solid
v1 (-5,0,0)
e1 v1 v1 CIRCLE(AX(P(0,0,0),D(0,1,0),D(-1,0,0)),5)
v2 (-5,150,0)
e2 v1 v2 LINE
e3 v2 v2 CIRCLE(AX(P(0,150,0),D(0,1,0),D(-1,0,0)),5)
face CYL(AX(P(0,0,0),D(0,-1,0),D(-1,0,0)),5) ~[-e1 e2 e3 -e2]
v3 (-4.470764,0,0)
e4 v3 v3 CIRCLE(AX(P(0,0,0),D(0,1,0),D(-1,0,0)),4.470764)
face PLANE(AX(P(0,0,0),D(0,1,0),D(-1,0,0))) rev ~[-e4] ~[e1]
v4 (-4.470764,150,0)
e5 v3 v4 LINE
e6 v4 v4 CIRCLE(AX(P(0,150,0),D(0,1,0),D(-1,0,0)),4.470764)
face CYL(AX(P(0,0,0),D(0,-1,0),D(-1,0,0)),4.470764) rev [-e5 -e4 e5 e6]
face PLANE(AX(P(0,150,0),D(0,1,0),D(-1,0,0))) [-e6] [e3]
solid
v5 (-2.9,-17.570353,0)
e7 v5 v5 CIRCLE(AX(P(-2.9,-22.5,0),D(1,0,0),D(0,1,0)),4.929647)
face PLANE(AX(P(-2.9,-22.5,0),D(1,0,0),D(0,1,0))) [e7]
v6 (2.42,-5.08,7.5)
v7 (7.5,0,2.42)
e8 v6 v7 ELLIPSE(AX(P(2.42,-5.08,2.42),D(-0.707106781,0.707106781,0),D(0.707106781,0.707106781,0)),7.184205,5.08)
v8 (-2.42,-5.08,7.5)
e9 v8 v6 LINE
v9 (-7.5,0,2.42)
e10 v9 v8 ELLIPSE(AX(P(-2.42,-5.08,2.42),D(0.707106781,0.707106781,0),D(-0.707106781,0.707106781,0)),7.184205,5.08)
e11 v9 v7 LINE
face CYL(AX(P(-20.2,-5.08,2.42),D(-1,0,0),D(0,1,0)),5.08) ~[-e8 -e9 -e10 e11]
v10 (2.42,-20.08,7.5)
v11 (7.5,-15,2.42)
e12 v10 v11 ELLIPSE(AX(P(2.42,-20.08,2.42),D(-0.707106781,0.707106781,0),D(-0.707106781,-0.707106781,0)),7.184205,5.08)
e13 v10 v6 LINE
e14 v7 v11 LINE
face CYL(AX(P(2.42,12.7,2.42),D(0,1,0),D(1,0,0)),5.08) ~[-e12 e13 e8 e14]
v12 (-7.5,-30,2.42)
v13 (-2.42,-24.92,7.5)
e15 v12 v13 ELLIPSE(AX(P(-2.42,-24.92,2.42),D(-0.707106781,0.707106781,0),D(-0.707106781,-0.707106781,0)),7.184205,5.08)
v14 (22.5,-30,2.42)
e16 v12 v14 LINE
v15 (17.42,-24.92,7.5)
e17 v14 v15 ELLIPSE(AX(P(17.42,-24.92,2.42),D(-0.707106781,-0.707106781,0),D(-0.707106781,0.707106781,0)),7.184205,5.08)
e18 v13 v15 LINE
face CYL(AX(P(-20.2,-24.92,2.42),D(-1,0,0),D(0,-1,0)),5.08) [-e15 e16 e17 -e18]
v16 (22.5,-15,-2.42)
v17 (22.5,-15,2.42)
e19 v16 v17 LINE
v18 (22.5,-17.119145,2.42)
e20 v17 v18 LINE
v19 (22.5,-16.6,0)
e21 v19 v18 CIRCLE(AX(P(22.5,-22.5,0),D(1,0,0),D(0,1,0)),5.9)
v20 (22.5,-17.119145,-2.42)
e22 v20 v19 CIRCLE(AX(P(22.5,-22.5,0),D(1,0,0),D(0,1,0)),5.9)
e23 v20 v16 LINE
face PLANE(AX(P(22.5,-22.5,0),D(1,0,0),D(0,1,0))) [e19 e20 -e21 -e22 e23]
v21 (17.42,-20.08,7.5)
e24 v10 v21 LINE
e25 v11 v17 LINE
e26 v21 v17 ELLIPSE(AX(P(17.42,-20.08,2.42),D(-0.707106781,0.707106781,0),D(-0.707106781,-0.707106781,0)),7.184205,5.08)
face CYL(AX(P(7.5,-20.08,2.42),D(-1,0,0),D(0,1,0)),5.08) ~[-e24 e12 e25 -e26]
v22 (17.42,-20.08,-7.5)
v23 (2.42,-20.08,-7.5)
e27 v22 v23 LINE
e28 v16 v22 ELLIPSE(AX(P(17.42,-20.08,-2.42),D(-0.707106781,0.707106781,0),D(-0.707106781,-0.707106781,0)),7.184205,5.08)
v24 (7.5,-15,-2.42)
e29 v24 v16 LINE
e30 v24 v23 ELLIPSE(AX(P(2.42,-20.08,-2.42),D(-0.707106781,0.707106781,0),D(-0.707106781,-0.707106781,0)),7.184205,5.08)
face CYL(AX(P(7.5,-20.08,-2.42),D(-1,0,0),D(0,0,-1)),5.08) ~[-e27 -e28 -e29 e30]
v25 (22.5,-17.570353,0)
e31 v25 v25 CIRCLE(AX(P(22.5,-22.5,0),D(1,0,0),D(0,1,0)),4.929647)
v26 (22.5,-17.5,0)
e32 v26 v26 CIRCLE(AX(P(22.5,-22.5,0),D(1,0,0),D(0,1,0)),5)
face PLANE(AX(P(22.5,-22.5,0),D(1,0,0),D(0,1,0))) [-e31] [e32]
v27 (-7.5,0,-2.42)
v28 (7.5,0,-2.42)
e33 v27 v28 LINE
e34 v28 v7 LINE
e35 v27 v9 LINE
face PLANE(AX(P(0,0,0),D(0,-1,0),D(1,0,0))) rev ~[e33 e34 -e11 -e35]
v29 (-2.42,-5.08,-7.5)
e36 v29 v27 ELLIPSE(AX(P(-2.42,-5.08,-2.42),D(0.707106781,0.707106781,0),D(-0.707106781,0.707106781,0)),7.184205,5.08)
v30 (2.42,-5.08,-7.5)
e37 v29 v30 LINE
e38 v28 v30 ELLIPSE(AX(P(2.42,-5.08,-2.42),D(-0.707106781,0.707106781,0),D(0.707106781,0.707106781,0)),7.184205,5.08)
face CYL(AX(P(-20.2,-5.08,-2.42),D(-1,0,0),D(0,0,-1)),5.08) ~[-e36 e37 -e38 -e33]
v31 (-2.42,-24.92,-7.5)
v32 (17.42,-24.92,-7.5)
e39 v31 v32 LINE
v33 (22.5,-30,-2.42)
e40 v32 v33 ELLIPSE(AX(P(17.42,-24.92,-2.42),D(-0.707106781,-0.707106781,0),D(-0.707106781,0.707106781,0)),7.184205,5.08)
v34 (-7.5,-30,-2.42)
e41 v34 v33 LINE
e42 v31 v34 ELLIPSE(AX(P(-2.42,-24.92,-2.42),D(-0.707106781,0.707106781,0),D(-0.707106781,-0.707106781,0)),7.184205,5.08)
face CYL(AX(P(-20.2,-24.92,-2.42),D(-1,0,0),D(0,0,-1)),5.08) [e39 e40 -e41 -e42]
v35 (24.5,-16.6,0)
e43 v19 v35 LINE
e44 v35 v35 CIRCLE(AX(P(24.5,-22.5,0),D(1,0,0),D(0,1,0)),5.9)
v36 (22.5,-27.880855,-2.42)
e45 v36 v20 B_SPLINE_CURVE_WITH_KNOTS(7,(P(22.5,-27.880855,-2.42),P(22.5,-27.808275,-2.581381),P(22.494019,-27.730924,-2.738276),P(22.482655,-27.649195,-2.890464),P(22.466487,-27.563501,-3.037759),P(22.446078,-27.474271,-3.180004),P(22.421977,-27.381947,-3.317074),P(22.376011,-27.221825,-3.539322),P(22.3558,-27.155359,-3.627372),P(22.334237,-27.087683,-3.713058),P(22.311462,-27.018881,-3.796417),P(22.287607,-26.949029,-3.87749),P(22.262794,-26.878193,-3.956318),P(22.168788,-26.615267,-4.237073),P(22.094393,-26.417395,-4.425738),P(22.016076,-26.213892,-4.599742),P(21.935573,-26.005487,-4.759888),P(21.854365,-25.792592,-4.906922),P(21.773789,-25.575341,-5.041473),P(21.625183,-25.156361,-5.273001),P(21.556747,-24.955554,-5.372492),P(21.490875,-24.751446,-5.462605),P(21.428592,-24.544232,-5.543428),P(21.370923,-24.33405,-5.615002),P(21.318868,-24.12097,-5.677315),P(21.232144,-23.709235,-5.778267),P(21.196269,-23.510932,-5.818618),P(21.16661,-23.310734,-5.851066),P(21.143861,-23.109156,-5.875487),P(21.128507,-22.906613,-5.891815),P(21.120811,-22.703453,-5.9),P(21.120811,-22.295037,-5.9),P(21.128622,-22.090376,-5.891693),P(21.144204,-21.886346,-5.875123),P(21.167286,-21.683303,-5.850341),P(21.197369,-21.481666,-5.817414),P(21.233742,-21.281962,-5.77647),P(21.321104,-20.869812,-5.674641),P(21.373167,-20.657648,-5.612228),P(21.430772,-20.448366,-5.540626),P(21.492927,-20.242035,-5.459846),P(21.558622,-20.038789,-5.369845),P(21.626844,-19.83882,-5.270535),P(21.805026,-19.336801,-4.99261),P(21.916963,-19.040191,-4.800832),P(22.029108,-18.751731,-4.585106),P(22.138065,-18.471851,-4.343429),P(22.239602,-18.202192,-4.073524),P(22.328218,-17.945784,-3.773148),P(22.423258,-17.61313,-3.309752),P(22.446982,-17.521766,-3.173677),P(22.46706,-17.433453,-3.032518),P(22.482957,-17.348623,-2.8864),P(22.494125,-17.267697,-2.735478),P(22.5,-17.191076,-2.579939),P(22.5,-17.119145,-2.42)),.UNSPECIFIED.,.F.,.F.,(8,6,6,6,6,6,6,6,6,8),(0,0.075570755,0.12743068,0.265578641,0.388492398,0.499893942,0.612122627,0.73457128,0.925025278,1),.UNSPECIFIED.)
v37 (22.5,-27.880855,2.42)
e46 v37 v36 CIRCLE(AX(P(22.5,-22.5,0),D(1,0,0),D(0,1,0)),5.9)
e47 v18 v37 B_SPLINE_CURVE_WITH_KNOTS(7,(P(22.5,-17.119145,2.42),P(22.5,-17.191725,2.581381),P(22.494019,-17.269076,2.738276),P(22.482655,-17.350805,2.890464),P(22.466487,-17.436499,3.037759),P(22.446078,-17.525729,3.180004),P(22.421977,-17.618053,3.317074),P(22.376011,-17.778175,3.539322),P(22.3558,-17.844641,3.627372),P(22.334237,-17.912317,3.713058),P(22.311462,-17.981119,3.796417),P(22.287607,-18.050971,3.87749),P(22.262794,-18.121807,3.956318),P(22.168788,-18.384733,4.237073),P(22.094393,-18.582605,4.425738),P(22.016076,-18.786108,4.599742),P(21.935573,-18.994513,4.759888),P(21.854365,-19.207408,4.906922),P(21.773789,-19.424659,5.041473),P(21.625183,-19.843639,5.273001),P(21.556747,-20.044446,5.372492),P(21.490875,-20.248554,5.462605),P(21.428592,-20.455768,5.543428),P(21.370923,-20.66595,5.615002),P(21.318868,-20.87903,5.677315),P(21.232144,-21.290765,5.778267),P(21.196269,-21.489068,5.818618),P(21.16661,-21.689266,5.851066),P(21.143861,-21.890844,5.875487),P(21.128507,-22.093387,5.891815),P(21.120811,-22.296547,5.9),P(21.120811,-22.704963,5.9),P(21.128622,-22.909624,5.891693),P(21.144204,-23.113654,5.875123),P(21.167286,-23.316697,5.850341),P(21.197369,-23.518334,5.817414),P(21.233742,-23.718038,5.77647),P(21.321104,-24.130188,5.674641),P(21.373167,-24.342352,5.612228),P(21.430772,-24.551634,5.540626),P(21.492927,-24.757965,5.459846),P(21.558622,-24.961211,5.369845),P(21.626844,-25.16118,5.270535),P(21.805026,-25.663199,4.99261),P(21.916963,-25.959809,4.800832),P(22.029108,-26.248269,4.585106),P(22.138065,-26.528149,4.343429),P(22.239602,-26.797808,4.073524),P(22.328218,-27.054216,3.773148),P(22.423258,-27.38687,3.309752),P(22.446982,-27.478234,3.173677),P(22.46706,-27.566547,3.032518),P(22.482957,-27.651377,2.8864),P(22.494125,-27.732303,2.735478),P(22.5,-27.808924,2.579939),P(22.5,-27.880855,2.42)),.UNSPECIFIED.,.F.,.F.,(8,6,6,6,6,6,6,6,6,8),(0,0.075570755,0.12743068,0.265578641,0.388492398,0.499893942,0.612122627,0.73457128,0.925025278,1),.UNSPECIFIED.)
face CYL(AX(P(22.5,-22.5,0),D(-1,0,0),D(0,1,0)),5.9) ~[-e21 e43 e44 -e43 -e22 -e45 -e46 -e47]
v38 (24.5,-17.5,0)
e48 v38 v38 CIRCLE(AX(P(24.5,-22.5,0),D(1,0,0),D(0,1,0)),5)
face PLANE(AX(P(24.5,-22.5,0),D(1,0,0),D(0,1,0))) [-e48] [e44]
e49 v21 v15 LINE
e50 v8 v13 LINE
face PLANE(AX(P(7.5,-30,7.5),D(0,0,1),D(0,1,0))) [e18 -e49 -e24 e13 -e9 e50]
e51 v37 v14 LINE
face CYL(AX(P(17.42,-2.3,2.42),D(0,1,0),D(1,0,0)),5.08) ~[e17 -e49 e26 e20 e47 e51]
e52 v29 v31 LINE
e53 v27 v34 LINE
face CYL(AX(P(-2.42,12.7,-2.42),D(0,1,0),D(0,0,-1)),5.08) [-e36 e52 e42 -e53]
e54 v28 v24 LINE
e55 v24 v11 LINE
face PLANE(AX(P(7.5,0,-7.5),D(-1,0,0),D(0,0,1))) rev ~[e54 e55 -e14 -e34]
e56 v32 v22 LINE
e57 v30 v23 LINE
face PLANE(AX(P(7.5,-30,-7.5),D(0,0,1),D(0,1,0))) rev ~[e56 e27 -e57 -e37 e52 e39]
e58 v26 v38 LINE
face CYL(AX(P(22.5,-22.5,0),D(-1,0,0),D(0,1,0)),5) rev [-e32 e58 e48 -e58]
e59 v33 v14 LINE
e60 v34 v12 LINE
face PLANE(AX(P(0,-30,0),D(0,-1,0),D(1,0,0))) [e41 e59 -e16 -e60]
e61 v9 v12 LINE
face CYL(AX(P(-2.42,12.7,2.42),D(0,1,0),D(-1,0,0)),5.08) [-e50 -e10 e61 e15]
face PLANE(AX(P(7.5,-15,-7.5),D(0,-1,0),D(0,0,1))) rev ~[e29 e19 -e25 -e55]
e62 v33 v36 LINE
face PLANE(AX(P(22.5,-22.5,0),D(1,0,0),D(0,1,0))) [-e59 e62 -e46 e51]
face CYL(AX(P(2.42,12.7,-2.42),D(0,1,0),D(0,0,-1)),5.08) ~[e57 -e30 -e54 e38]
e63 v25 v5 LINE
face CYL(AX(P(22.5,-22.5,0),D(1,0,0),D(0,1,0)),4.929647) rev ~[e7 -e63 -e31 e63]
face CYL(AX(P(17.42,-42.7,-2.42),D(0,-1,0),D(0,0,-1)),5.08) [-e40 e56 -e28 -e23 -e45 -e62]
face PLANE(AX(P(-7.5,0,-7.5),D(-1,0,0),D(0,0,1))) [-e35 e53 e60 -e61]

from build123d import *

# Parameters (mm, degrees)
F0_W          = 15
F0_H          = 15
F0_W_2        = 10
F0_H_2        = 10
F1_DEPTH      = 30
F2_W          = 15
F2_H          = 15
F2_W_2        = 10
F2_H_2        = 10
F4_DEPTH      = 15
F3_W          = 10
F3_H          = 10
F5_DEPTH      = 30
F6_R          = 5
F6_R_2        = 4.4707642424
F7_DEPTH      = 150
F8_W          = 10
F8_H          = 10
F9_DEPTH      = 15
F10_R         = 5.9
F10_R_2       = 5
F11_DEPTH     = 2
F12_R         = 4.929647133
F13_DEPTH     = 25.4
F14_T1_DEPTH  = 27.7
F14_T3_DEPTH  = 27.7
F14_T5_DEPTH  = 55.4
F14_T7_DEPTH  = 55.4
F14_T9_DEPTH  = 40.4
F14_T14_DEPTH = 40.4
F14_S15_R     = 5.9
F14_T16_DEPTH = 22
F14_T20_DEPTH = 40.4
F14_S21_R     = 5.9
F14_T22_DEPTH = 22
F14_T27_DEPTH = 27.7
F14_T31_DEPTH = 27.7
F14_S33_R     = 4.929647133
F14_T34_DEPTH = 16
F14_T40_DEPTH = 27.7
F14_T44_DEPTH = 27.7
F14_S46_R     = 4.929647133
F14_T47_DEPTH = 16


# Not quite as in the source:
# - a fillet or chamfer that OpenCascade refuses, or shapes differently, is made with other operations: its cross-section is extruded or revolved along the edge and cut away or added


with BuildPart() as f1:
    # F0 (on Front) → F1 (new body)
    with BuildSketch(Plane.XZ):
        Rectangle(F0_W, F0_H)
        Rectangle(F0_W_2, F0_H_2, mode=Mode.SUBTRACT)
    extrude(amount=F1_DEPTH)

    # F2 (on face) → F4 (join)
    with BuildSketch(Plane.YZ.offset(7.5)):
        with Locations((-22.5, 0)):
            Rectangle(F2_W, F2_H)
        with Locations((-22.5, 0)):
            Rectangle(F2_W_2, F2_H_2, mode=Mode.SUBTRACT)
    extrude(amount=F4_DEPTH)

    # F3 (on face) → F5 (join)
    with BuildSketch(Plane.XZ.offset(30)):
        Rectangle(F3_W, F3_H)
    extrude(amount=-F5_DEPTH)

    # F8 (on face) → F9 (join)
    with BuildSketch(Plane.YZ.offset(7.5)):
        with Locations((-22.5, 0)):
            Rectangle(F8_W, F8_H)
    extrude(amount=F9_DEPTH)

    # F10 (on face) → F11 (join)
    with BuildSketch(Plane.YZ.offset(22.5)):
        with Locations((-22.5, 0)):
            Circle(F10_R)
        with Locations((-22.5, 0)):
            Circle(F10_R_2, mode=Mode.SUBTRACT)
    extrude(amount=F11_DEPTH)

    # F12 (on face) → F13 (cut)
    with BuildSketch(Plane.YZ.offset(22.5)):
        with Locations((-22.5, 0)):
            Circle(F12_R)
    extrude(amount=-F13_DEPTH, mode=Mode.SUBTRACT)

    # F14: fillet of radius 5.08 on 12 edges, made by hand

    # F14_s2 → F14_t1 (cut)
    with BuildSketch(Plane.XZ.offset(-12.7)):
        with BuildLine():
            ThreePointArc((7.5, 2.42), (6.0121024484, 6.0121024484), (2.42, 7.5))
            Line((2.42, 7.5), (7.5, 7.5))
            Line((7.5, 7.5), (7.5, 2.42))
        make_face()
        with BuildLine():
            ThreePointArc((2.42, -7.5), (6.0121024484, -6.0121024484), (7.5, -2.42))
            Line((7.5, -2.42), (7.5, -7.5))
            Line((7.5, -7.5), (2.42, -7.5))
        make_face()
    extrude(amount=F14_T1_DEPTH, mode=Mode.SUBTRACT)

    # F14_s4 → F14_t3 (cut)
    with BuildSketch(Plane.YZ.offset(7.5)):
        with BuildLine():
            ThreePointArc((-15, 2.42), (-16.4878975516, 6.0121024484), (-20.08, 7.5))
            Line((-20.08, 7.5), (-15, 7.5))
            Line((-15, 7.5), (-15, 2.42))
        make_face()
        with BuildLine():
            ThreePointArc((-20.08, -7.5), (-16.4878975516, -6.0121024484), (-15, -2.42))
            Line((-15, -2.42), (-15, -7.5))
            Line((-15, -7.5), (-20.08, -7.5))
        make_face()
    extrude(amount=F14_T3_DEPTH, mode=Mode.SUBTRACT)

    # F14_s6 → F14_t5 (cut)
    with BuildSketch(Plane.YZ.offset(-20.2)):
        with BuildLine():
            ThreePointArc((-30, 2.42), (-28.5121024484, 6.0121024484), (-24.92, 7.5))
            Line((-24.92, 7.5), (-30, 7.5))
            Line((-30, 7.5), (-30, 2.42))
        make_face()
        with BuildLine():
            ThreePointArc((-24.92, -7.5), (-28.5121024484, -6.0121024484), (-30, -2.42))
            Line((-30, -2.42), (-30, -7.5))
            Line((-30, -7.5), (-24.92, -7.5))
        make_face()
    extrude(amount=F14_T5_DEPTH, mode=Mode.SUBTRACT)

    # F14_s8 → F14_t7 (cut)
    with BuildSketch(Plane.XZ.offset(-12.7)):
        with BuildLine():
            ThreePointArc((-7.5, 2.42), (-6.0121024484, 6.0121024484), (-2.42, 7.5))
            Line((-2.42, 7.5), (-7.5, 7.5))
            Line((-7.5, 7.5), (-7.5, 2.42))
        make_face()
        with BuildLine():
            ThreePointArc((-2.42, -7.5), (-6.0121024484, -6.0121024484), (-7.5, -2.42))
            Line((-7.5, -2.42), (-7.5, -7.5))
            Line((-7.5, -7.5), (-2.42, -7.5))
        make_face()
    extrude(amount=F14_T7_DEPTH, mode=Mode.SUBTRACT)

    # F14_s10 → F14_t9 (cut)
    with BuildSketch(Plane.YZ.offset(-20.2)):
        with BuildLine():
            ThreePointArc((0, 2.42), (-1.4878975516, 6.0121024484), (-5.08, 7.5))
            Line((-5.08, 7.5), (0, 7.5))
            Line((0, 7.5), (0, 2.42))
        make_face()
        with BuildLine():
            ThreePointArc((-5.08, -7.5), (-1.4878975516, -6.0121024484), (0, -2.42))
            Line((0, -2.42), (0, -7.5))
            Line((0, -7.5), (-5.08, -7.5))
        make_face()
    extrude(amount=F14_T9_DEPTH, mode=Mode.SUBTRACT)


with BuildPart() as f7:
    # F6 (on face) → F7 (new body)
    with BuildSketch(Plane(origin=(0, 0, 0), x_dir=(-1, 0, 0), z_dir=(0, 1, 0))):
        Circle(F6_R)
        Circle(F6_R_2, mode=Mode.SUBTRACT)
    extrude(amount=F7_DEPTH)


with BuildPart() as f14_tool12:
    # F14_s13 → F14_t14 (new body)
    with BuildSketch(Plane.XZ.offset(2.3)):
        with BuildLine():
            ThreePointArc((22.5, 2.42), (21.0121024484, 6.0121024484), (17.42, 7.5))
            Line((17.42, 7.5), (22.5, 7.5))
            Line((22.5, 7.5), (22.5, 2.42))
        make_face()
    extrude(amount=F14_T14_DEPTH)

    # F14_s15 → F14_t16 (cut, symmetric)
    with BuildSketch(Plane.YZ.offset(20)):
        with Locations((-22.5, 0)):
            Circle(F14_S15_R)
    extrude(amount=F14_T16_DEPTH, both=True, mode=Mode.SUBTRACT)


with BuildPart() as f1_1:
    add(f1.part)

    # F14_t11: cut F14_tool12
    add(f14_tool12.part, mode=Mode.SUBTRACT)


with BuildPart() as f14_tool18:
    # F14_s19 → F14_t20 (new body)
    with BuildSketch(Plane.XZ.offset(42.7)):
        with BuildLine():
            ThreePointArc((17.42, -7.5), (21.0121024484, -6.0121024484), (22.5, -2.42))
            Line((22.5, -2.42), (22.5, -7.5))
            Line((22.5, -7.5), (17.42, -7.5))
        make_face()
    extrude(amount=-F14_T20_DEPTH)

    # F14_s21 → F14_t22 (cut, symmetric)
    with BuildSketch(Plane.YZ.offset(20)):
        with Locations((-22.5, 0)):
            Circle(F14_S21_R)
    extrude(amount=F14_T22_DEPTH, both=True, mode=Mode.SUBTRACT)


with BuildPart() as f1_2:
    add(f1_1.part)

    # F14_t17: cut F14_tool18
    add(f14_tool18.part, mode=Mode.SUBTRACT)


with BuildPart() as f14_tool25:
    # F14_s26 → F14_t27 (new body)
    with BuildSketch(Plane.YZ.offset(-5.2)):
        with BuildLine():
            ThreePointArc((-15, 2.42), (-16.4878975516, 6.0121024484), (-20.08, 7.5))
            Line((-20.08, 7.5), (-15, 7.5))
            Line((-15, 7.5), (-15, 2.42))
        make_face()
    extrude(amount=F14_T27_DEPTH)

    split(bisect_by=Plane.YZ.offset(7.5), keep=Keep.BOTTOM)


with BuildPart() as f14_tool29:
    # F14_s30 → F14_t31 (new body)
    with BuildSketch(Plane.XZ):
        with BuildLine():
            ThreePointArc((7.5, 2.42), (6.0121024484, 6.0121024484), (2.42, 7.5))
            Line((2.42, 7.5), (7.5, 7.5))
            Line((7.5, 7.5), (7.5, 2.42))
        make_face()
    extrude(amount=F14_T31_DEPTH)

    split(bisect_by=Plane.XZ.offset(15), keep=Keep.TOP)

    # F14_s33 → F14_t34 (cut, symmetric)
    with BuildSketch(Plane.YZ.offset(5)):
        with Locations((-22.5, 0)):
            Circle(F14_S33_R)
    extrude(amount=F14_T34_DEPTH, both=True, mode=Mode.SUBTRACT)


with BuildPart() as f14_tool25_1:
    add(f14_tool25.part)

    # F14_t35: intersect F14_tool29
    add(f14_tool29.part, mode=Mode.INTERSECT)


with BuildPart() as f1_3:
    add(f1_2.part)

    # F14_t23: cut F14_tool25
    add(f14_tool25_1.part, mode=Mode.SUBTRACT)


with BuildPart() as f14_tool38:
    # F14_s39 → F14_t40 (new body)
    with BuildSketch(Plane.YZ.offset(-5.2)):
        with BuildLine():
            ThreePointArc((-20.08, -7.5), (-16.4878975516, -6.0121024484), (-15, -2.42))
            Line((-15, -2.42), (-15, -7.5))
            Line((-15, -7.5), (-20.08, -7.5))
        make_face()
    extrude(amount=F14_T40_DEPTH)

    split(bisect_by=Plane.YZ.offset(7.5), keep=Keep.BOTTOM)


with BuildPart() as f14_tool42:
    # F14_s43 → F14_t44 (new body)
    with BuildSketch(Plane.XZ):
        with BuildLine():
            ThreePointArc((2.42, -7.5), (6.0121024484, -6.0121024484), (7.5, -2.42))
            Line((7.5, -2.42), (7.5, -7.5))
            Line((7.5, -7.5), (2.42, -7.5))
        make_face()
    extrude(amount=F14_T44_DEPTH)

    split(bisect_by=Plane.XZ.offset(15), keep=Keep.TOP)

    # F14_s46 → F14_t47 (cut, symmetric)
    with BuildSketch(Plane.YZ.offset(5)):
        with Locations((-22.5, 0)):
            Circle(F14_S46_R)
    extrude(amount=F14_T47_DEPTH, both=True, mode=Mode.SUBTRACT)


with BuildPart() as f14_tool38_1:
    add(f14_tool38.part)

    # F14_t48: intersect F14_tool42
    add(f14_tool42.part, mode=Mode.INTERSECT)


with BuildPart() as f1_4:
    add(f1_3.part)

    # F14_t36: cut F14_tool38
    add(f14_tool38_1.part, mode=Mode.SUBTRACT)


solid = Compound([f7.part, f1_4.part])
